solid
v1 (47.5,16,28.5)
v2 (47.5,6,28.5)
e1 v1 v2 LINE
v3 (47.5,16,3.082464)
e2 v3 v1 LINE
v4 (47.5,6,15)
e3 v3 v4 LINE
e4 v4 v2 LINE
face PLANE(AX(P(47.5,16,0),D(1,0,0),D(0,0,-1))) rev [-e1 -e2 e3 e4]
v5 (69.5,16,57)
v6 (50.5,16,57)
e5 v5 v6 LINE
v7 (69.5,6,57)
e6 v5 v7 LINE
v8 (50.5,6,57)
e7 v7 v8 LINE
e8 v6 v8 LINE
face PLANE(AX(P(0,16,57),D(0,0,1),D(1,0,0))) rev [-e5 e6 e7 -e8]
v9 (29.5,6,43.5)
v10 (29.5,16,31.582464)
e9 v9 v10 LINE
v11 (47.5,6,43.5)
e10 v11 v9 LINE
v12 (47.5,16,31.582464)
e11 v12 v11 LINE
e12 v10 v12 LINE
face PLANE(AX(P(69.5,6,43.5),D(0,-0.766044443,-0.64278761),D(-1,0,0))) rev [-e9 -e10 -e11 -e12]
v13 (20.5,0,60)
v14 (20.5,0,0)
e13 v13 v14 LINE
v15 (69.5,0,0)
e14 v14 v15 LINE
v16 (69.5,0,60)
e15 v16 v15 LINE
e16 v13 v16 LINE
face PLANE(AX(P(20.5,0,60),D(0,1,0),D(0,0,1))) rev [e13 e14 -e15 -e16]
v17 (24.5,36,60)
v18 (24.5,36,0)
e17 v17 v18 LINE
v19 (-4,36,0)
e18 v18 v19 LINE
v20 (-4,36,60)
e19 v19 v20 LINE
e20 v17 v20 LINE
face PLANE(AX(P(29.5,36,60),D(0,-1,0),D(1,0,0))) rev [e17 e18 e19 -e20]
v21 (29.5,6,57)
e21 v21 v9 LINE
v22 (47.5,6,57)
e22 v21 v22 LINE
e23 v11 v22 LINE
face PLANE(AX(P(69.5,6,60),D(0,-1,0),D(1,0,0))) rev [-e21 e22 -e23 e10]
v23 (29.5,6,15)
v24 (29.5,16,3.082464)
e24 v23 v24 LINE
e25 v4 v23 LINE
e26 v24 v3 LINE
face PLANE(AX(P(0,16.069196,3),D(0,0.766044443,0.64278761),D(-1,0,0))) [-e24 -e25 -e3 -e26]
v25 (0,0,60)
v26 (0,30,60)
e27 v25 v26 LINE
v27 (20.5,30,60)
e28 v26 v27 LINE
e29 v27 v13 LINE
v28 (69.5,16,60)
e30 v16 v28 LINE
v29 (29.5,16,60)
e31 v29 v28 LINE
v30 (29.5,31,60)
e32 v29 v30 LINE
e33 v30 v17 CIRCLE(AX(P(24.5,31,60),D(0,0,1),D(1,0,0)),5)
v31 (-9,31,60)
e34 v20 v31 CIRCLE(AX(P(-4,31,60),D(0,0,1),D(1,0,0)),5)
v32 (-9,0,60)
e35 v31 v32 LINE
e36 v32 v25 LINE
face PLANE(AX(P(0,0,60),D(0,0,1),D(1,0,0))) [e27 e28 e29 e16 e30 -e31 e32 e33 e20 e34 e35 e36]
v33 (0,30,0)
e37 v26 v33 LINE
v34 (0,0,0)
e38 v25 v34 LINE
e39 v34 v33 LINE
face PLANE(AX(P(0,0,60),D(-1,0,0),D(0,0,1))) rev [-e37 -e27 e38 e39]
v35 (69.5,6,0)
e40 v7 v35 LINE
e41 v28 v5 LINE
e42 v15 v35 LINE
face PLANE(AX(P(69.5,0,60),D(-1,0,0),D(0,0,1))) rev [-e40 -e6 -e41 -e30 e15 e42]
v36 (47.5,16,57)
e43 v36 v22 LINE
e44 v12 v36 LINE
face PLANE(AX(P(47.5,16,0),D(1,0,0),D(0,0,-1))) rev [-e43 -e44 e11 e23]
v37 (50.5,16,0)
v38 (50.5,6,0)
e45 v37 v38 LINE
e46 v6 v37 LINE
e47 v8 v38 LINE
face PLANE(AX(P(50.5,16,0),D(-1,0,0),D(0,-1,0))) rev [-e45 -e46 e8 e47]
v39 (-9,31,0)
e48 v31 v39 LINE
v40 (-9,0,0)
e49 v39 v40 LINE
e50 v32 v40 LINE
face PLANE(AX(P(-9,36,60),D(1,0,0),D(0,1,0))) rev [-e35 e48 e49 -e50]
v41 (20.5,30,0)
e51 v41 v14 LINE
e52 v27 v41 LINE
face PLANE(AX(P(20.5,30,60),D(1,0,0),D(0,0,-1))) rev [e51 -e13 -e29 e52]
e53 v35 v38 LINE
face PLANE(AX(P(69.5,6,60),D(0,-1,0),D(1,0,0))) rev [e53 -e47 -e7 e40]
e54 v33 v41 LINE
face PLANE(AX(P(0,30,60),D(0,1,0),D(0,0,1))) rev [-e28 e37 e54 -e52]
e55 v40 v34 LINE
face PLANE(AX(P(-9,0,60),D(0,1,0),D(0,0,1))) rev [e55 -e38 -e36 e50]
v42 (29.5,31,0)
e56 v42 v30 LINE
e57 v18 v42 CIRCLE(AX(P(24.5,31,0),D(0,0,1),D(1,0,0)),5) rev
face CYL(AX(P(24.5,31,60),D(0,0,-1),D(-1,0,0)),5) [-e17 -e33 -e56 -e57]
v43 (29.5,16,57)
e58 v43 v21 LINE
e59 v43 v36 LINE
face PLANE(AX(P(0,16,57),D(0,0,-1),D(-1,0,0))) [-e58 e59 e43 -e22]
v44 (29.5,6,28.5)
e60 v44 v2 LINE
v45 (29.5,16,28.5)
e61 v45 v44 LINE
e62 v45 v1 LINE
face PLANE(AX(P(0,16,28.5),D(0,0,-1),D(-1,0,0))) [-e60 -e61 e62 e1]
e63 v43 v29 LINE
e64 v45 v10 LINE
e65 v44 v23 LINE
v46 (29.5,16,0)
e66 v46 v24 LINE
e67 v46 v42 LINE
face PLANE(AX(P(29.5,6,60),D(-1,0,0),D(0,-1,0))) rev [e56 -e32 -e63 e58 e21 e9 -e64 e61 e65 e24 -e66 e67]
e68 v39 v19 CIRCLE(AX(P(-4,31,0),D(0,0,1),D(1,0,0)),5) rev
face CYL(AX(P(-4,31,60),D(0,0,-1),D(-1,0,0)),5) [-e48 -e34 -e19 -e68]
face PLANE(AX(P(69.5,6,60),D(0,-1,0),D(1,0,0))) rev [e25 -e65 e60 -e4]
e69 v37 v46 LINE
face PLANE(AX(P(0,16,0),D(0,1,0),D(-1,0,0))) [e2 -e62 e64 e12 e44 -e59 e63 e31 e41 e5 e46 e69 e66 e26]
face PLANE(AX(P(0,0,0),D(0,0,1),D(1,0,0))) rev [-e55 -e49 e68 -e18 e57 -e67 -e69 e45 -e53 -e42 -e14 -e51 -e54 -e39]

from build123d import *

# Parameters (mm, degrees)
BOSS_EXTRUDE1_DEPTH = 60
SKETCH2_W           = 18
SKETCH2_H           = 3
BOSS_EXTRUDE2_DEPTH = 10
CHAMFER1_SIZE       = 10.069195574
CHAMFER1_SIZE_2     = 12
FILLET1_R           = 5


with BuildPart() as part:
    # Sketch1 → Boss-Extrude1 (new body)
    with BuildSketch(Plane.XY):
        Polygon((0, 0), (0, 30), (20.5, 30), (20.5, 0), (69.5, 0), (69.5, 6), (29.5, 6), (29.5, 36), (-9, 36), (-9, 0), align=None)
    extrude(amount=BOSS_EXTRUDE1_DEPTH)

    # Sketch2 → Boss-Extrude2 (add)
    with BuildSketch(Plane(origin=(0, 6, 0), x_dir=(1, 0, 0), z_dir=(0, 1, 0))):
        with Locations((38.5, -1.5)):
            Rectangle(SKETCH2_W, SKETCH2_H)
        Polygon((50.5, 0), (47.5, 0), (47.5, -3), (47.5, -28.5), (47.5, -31.5), (47.5, -57), (47.5, -60), (69.5, -60), (69.5, -57), (50.5, -57), align=None)
        with Locations((38.5, -30)):
            Rectangle(SKETCH2_W, SKETCH2_H)
        with Locations((38.5, -58.5)):
            Rectangle(SKETCH2_W, SKETCH2_H)
    extrude(amount=BOSS_EXTRUDE2_DEPTH)

    # Chamfer1
    # the kernel refuses this chamfer: 12, 10.069195574 mm, written as the material it adds along each edge
    with BuildSketch(Plane(origin=(29.5, 6, 31.5), x_dir=(0, 0.9993728857116145, -0.03540953691366269), z_dir=(1, 0, 0))) as chamfer1_piece_1_section:
        Polygon((CHAMFER1_SIZE * 0.999372885724, CHAMFER1_SIZE * 0.0354095369141), (-CHAMFER1_SIZE_2 * 0.0354095369137, CHAMFER1_SIZE_2 * 0.999372885712), (0, 0), align=None)
    chamfer1_piece_1 = extrude(amount=18, mode=Mode.PRIVATE)
    chamfer1_piece_1 = split(chamfer1_piece_1, bisect_by=Plane(origin=(38.5, 16, 35.487012509), z_dir=(0, -1, 0)), keep=Keep.TOP, mode=Mode.PRIVATE)
    add(chamfer1_piece_1)
    with BuildSketch(Plane(origin=(29.5, 6, 3), x_dir=(0, -0.024939322090234344, 0.9996889667359941), z_dir=(1, 0, 0))) as chamfer1_piece_2_section:
        Polygon((CHAMFER1_SIZE_2 * 0.999688966736, -CHAMFER1_SIZE_2 * 0.0249393220902), (-CHAMFER1_SIZE * 0.0249393220905, -CHAMFER1_SIZE * 0.999688966749), (0, 0), align=None)
    chamfer1_piece_2 = extrude(amount=18, mode=Mode.PRIVATE)
    chamfer1_piece_2 = split(chamfer1_piece_2, bisect_by=Plane(origin=(38.5, 16, 6.987012509), z_dir=(0, -1, 0)), keep=Keep.TOP, mode=Mode.PRIVATE)
    add(chamfer1_piece_2)

    # Fillet1
    fillet1_edges = [part.edges().sort_by_distance(p)[0] for p in [
        (-9, 36, 30),
        (29.5, 36, 30),
    ]]
    fillet(fillet1_edges, radius=FILLET1_R)


solid = part.part
